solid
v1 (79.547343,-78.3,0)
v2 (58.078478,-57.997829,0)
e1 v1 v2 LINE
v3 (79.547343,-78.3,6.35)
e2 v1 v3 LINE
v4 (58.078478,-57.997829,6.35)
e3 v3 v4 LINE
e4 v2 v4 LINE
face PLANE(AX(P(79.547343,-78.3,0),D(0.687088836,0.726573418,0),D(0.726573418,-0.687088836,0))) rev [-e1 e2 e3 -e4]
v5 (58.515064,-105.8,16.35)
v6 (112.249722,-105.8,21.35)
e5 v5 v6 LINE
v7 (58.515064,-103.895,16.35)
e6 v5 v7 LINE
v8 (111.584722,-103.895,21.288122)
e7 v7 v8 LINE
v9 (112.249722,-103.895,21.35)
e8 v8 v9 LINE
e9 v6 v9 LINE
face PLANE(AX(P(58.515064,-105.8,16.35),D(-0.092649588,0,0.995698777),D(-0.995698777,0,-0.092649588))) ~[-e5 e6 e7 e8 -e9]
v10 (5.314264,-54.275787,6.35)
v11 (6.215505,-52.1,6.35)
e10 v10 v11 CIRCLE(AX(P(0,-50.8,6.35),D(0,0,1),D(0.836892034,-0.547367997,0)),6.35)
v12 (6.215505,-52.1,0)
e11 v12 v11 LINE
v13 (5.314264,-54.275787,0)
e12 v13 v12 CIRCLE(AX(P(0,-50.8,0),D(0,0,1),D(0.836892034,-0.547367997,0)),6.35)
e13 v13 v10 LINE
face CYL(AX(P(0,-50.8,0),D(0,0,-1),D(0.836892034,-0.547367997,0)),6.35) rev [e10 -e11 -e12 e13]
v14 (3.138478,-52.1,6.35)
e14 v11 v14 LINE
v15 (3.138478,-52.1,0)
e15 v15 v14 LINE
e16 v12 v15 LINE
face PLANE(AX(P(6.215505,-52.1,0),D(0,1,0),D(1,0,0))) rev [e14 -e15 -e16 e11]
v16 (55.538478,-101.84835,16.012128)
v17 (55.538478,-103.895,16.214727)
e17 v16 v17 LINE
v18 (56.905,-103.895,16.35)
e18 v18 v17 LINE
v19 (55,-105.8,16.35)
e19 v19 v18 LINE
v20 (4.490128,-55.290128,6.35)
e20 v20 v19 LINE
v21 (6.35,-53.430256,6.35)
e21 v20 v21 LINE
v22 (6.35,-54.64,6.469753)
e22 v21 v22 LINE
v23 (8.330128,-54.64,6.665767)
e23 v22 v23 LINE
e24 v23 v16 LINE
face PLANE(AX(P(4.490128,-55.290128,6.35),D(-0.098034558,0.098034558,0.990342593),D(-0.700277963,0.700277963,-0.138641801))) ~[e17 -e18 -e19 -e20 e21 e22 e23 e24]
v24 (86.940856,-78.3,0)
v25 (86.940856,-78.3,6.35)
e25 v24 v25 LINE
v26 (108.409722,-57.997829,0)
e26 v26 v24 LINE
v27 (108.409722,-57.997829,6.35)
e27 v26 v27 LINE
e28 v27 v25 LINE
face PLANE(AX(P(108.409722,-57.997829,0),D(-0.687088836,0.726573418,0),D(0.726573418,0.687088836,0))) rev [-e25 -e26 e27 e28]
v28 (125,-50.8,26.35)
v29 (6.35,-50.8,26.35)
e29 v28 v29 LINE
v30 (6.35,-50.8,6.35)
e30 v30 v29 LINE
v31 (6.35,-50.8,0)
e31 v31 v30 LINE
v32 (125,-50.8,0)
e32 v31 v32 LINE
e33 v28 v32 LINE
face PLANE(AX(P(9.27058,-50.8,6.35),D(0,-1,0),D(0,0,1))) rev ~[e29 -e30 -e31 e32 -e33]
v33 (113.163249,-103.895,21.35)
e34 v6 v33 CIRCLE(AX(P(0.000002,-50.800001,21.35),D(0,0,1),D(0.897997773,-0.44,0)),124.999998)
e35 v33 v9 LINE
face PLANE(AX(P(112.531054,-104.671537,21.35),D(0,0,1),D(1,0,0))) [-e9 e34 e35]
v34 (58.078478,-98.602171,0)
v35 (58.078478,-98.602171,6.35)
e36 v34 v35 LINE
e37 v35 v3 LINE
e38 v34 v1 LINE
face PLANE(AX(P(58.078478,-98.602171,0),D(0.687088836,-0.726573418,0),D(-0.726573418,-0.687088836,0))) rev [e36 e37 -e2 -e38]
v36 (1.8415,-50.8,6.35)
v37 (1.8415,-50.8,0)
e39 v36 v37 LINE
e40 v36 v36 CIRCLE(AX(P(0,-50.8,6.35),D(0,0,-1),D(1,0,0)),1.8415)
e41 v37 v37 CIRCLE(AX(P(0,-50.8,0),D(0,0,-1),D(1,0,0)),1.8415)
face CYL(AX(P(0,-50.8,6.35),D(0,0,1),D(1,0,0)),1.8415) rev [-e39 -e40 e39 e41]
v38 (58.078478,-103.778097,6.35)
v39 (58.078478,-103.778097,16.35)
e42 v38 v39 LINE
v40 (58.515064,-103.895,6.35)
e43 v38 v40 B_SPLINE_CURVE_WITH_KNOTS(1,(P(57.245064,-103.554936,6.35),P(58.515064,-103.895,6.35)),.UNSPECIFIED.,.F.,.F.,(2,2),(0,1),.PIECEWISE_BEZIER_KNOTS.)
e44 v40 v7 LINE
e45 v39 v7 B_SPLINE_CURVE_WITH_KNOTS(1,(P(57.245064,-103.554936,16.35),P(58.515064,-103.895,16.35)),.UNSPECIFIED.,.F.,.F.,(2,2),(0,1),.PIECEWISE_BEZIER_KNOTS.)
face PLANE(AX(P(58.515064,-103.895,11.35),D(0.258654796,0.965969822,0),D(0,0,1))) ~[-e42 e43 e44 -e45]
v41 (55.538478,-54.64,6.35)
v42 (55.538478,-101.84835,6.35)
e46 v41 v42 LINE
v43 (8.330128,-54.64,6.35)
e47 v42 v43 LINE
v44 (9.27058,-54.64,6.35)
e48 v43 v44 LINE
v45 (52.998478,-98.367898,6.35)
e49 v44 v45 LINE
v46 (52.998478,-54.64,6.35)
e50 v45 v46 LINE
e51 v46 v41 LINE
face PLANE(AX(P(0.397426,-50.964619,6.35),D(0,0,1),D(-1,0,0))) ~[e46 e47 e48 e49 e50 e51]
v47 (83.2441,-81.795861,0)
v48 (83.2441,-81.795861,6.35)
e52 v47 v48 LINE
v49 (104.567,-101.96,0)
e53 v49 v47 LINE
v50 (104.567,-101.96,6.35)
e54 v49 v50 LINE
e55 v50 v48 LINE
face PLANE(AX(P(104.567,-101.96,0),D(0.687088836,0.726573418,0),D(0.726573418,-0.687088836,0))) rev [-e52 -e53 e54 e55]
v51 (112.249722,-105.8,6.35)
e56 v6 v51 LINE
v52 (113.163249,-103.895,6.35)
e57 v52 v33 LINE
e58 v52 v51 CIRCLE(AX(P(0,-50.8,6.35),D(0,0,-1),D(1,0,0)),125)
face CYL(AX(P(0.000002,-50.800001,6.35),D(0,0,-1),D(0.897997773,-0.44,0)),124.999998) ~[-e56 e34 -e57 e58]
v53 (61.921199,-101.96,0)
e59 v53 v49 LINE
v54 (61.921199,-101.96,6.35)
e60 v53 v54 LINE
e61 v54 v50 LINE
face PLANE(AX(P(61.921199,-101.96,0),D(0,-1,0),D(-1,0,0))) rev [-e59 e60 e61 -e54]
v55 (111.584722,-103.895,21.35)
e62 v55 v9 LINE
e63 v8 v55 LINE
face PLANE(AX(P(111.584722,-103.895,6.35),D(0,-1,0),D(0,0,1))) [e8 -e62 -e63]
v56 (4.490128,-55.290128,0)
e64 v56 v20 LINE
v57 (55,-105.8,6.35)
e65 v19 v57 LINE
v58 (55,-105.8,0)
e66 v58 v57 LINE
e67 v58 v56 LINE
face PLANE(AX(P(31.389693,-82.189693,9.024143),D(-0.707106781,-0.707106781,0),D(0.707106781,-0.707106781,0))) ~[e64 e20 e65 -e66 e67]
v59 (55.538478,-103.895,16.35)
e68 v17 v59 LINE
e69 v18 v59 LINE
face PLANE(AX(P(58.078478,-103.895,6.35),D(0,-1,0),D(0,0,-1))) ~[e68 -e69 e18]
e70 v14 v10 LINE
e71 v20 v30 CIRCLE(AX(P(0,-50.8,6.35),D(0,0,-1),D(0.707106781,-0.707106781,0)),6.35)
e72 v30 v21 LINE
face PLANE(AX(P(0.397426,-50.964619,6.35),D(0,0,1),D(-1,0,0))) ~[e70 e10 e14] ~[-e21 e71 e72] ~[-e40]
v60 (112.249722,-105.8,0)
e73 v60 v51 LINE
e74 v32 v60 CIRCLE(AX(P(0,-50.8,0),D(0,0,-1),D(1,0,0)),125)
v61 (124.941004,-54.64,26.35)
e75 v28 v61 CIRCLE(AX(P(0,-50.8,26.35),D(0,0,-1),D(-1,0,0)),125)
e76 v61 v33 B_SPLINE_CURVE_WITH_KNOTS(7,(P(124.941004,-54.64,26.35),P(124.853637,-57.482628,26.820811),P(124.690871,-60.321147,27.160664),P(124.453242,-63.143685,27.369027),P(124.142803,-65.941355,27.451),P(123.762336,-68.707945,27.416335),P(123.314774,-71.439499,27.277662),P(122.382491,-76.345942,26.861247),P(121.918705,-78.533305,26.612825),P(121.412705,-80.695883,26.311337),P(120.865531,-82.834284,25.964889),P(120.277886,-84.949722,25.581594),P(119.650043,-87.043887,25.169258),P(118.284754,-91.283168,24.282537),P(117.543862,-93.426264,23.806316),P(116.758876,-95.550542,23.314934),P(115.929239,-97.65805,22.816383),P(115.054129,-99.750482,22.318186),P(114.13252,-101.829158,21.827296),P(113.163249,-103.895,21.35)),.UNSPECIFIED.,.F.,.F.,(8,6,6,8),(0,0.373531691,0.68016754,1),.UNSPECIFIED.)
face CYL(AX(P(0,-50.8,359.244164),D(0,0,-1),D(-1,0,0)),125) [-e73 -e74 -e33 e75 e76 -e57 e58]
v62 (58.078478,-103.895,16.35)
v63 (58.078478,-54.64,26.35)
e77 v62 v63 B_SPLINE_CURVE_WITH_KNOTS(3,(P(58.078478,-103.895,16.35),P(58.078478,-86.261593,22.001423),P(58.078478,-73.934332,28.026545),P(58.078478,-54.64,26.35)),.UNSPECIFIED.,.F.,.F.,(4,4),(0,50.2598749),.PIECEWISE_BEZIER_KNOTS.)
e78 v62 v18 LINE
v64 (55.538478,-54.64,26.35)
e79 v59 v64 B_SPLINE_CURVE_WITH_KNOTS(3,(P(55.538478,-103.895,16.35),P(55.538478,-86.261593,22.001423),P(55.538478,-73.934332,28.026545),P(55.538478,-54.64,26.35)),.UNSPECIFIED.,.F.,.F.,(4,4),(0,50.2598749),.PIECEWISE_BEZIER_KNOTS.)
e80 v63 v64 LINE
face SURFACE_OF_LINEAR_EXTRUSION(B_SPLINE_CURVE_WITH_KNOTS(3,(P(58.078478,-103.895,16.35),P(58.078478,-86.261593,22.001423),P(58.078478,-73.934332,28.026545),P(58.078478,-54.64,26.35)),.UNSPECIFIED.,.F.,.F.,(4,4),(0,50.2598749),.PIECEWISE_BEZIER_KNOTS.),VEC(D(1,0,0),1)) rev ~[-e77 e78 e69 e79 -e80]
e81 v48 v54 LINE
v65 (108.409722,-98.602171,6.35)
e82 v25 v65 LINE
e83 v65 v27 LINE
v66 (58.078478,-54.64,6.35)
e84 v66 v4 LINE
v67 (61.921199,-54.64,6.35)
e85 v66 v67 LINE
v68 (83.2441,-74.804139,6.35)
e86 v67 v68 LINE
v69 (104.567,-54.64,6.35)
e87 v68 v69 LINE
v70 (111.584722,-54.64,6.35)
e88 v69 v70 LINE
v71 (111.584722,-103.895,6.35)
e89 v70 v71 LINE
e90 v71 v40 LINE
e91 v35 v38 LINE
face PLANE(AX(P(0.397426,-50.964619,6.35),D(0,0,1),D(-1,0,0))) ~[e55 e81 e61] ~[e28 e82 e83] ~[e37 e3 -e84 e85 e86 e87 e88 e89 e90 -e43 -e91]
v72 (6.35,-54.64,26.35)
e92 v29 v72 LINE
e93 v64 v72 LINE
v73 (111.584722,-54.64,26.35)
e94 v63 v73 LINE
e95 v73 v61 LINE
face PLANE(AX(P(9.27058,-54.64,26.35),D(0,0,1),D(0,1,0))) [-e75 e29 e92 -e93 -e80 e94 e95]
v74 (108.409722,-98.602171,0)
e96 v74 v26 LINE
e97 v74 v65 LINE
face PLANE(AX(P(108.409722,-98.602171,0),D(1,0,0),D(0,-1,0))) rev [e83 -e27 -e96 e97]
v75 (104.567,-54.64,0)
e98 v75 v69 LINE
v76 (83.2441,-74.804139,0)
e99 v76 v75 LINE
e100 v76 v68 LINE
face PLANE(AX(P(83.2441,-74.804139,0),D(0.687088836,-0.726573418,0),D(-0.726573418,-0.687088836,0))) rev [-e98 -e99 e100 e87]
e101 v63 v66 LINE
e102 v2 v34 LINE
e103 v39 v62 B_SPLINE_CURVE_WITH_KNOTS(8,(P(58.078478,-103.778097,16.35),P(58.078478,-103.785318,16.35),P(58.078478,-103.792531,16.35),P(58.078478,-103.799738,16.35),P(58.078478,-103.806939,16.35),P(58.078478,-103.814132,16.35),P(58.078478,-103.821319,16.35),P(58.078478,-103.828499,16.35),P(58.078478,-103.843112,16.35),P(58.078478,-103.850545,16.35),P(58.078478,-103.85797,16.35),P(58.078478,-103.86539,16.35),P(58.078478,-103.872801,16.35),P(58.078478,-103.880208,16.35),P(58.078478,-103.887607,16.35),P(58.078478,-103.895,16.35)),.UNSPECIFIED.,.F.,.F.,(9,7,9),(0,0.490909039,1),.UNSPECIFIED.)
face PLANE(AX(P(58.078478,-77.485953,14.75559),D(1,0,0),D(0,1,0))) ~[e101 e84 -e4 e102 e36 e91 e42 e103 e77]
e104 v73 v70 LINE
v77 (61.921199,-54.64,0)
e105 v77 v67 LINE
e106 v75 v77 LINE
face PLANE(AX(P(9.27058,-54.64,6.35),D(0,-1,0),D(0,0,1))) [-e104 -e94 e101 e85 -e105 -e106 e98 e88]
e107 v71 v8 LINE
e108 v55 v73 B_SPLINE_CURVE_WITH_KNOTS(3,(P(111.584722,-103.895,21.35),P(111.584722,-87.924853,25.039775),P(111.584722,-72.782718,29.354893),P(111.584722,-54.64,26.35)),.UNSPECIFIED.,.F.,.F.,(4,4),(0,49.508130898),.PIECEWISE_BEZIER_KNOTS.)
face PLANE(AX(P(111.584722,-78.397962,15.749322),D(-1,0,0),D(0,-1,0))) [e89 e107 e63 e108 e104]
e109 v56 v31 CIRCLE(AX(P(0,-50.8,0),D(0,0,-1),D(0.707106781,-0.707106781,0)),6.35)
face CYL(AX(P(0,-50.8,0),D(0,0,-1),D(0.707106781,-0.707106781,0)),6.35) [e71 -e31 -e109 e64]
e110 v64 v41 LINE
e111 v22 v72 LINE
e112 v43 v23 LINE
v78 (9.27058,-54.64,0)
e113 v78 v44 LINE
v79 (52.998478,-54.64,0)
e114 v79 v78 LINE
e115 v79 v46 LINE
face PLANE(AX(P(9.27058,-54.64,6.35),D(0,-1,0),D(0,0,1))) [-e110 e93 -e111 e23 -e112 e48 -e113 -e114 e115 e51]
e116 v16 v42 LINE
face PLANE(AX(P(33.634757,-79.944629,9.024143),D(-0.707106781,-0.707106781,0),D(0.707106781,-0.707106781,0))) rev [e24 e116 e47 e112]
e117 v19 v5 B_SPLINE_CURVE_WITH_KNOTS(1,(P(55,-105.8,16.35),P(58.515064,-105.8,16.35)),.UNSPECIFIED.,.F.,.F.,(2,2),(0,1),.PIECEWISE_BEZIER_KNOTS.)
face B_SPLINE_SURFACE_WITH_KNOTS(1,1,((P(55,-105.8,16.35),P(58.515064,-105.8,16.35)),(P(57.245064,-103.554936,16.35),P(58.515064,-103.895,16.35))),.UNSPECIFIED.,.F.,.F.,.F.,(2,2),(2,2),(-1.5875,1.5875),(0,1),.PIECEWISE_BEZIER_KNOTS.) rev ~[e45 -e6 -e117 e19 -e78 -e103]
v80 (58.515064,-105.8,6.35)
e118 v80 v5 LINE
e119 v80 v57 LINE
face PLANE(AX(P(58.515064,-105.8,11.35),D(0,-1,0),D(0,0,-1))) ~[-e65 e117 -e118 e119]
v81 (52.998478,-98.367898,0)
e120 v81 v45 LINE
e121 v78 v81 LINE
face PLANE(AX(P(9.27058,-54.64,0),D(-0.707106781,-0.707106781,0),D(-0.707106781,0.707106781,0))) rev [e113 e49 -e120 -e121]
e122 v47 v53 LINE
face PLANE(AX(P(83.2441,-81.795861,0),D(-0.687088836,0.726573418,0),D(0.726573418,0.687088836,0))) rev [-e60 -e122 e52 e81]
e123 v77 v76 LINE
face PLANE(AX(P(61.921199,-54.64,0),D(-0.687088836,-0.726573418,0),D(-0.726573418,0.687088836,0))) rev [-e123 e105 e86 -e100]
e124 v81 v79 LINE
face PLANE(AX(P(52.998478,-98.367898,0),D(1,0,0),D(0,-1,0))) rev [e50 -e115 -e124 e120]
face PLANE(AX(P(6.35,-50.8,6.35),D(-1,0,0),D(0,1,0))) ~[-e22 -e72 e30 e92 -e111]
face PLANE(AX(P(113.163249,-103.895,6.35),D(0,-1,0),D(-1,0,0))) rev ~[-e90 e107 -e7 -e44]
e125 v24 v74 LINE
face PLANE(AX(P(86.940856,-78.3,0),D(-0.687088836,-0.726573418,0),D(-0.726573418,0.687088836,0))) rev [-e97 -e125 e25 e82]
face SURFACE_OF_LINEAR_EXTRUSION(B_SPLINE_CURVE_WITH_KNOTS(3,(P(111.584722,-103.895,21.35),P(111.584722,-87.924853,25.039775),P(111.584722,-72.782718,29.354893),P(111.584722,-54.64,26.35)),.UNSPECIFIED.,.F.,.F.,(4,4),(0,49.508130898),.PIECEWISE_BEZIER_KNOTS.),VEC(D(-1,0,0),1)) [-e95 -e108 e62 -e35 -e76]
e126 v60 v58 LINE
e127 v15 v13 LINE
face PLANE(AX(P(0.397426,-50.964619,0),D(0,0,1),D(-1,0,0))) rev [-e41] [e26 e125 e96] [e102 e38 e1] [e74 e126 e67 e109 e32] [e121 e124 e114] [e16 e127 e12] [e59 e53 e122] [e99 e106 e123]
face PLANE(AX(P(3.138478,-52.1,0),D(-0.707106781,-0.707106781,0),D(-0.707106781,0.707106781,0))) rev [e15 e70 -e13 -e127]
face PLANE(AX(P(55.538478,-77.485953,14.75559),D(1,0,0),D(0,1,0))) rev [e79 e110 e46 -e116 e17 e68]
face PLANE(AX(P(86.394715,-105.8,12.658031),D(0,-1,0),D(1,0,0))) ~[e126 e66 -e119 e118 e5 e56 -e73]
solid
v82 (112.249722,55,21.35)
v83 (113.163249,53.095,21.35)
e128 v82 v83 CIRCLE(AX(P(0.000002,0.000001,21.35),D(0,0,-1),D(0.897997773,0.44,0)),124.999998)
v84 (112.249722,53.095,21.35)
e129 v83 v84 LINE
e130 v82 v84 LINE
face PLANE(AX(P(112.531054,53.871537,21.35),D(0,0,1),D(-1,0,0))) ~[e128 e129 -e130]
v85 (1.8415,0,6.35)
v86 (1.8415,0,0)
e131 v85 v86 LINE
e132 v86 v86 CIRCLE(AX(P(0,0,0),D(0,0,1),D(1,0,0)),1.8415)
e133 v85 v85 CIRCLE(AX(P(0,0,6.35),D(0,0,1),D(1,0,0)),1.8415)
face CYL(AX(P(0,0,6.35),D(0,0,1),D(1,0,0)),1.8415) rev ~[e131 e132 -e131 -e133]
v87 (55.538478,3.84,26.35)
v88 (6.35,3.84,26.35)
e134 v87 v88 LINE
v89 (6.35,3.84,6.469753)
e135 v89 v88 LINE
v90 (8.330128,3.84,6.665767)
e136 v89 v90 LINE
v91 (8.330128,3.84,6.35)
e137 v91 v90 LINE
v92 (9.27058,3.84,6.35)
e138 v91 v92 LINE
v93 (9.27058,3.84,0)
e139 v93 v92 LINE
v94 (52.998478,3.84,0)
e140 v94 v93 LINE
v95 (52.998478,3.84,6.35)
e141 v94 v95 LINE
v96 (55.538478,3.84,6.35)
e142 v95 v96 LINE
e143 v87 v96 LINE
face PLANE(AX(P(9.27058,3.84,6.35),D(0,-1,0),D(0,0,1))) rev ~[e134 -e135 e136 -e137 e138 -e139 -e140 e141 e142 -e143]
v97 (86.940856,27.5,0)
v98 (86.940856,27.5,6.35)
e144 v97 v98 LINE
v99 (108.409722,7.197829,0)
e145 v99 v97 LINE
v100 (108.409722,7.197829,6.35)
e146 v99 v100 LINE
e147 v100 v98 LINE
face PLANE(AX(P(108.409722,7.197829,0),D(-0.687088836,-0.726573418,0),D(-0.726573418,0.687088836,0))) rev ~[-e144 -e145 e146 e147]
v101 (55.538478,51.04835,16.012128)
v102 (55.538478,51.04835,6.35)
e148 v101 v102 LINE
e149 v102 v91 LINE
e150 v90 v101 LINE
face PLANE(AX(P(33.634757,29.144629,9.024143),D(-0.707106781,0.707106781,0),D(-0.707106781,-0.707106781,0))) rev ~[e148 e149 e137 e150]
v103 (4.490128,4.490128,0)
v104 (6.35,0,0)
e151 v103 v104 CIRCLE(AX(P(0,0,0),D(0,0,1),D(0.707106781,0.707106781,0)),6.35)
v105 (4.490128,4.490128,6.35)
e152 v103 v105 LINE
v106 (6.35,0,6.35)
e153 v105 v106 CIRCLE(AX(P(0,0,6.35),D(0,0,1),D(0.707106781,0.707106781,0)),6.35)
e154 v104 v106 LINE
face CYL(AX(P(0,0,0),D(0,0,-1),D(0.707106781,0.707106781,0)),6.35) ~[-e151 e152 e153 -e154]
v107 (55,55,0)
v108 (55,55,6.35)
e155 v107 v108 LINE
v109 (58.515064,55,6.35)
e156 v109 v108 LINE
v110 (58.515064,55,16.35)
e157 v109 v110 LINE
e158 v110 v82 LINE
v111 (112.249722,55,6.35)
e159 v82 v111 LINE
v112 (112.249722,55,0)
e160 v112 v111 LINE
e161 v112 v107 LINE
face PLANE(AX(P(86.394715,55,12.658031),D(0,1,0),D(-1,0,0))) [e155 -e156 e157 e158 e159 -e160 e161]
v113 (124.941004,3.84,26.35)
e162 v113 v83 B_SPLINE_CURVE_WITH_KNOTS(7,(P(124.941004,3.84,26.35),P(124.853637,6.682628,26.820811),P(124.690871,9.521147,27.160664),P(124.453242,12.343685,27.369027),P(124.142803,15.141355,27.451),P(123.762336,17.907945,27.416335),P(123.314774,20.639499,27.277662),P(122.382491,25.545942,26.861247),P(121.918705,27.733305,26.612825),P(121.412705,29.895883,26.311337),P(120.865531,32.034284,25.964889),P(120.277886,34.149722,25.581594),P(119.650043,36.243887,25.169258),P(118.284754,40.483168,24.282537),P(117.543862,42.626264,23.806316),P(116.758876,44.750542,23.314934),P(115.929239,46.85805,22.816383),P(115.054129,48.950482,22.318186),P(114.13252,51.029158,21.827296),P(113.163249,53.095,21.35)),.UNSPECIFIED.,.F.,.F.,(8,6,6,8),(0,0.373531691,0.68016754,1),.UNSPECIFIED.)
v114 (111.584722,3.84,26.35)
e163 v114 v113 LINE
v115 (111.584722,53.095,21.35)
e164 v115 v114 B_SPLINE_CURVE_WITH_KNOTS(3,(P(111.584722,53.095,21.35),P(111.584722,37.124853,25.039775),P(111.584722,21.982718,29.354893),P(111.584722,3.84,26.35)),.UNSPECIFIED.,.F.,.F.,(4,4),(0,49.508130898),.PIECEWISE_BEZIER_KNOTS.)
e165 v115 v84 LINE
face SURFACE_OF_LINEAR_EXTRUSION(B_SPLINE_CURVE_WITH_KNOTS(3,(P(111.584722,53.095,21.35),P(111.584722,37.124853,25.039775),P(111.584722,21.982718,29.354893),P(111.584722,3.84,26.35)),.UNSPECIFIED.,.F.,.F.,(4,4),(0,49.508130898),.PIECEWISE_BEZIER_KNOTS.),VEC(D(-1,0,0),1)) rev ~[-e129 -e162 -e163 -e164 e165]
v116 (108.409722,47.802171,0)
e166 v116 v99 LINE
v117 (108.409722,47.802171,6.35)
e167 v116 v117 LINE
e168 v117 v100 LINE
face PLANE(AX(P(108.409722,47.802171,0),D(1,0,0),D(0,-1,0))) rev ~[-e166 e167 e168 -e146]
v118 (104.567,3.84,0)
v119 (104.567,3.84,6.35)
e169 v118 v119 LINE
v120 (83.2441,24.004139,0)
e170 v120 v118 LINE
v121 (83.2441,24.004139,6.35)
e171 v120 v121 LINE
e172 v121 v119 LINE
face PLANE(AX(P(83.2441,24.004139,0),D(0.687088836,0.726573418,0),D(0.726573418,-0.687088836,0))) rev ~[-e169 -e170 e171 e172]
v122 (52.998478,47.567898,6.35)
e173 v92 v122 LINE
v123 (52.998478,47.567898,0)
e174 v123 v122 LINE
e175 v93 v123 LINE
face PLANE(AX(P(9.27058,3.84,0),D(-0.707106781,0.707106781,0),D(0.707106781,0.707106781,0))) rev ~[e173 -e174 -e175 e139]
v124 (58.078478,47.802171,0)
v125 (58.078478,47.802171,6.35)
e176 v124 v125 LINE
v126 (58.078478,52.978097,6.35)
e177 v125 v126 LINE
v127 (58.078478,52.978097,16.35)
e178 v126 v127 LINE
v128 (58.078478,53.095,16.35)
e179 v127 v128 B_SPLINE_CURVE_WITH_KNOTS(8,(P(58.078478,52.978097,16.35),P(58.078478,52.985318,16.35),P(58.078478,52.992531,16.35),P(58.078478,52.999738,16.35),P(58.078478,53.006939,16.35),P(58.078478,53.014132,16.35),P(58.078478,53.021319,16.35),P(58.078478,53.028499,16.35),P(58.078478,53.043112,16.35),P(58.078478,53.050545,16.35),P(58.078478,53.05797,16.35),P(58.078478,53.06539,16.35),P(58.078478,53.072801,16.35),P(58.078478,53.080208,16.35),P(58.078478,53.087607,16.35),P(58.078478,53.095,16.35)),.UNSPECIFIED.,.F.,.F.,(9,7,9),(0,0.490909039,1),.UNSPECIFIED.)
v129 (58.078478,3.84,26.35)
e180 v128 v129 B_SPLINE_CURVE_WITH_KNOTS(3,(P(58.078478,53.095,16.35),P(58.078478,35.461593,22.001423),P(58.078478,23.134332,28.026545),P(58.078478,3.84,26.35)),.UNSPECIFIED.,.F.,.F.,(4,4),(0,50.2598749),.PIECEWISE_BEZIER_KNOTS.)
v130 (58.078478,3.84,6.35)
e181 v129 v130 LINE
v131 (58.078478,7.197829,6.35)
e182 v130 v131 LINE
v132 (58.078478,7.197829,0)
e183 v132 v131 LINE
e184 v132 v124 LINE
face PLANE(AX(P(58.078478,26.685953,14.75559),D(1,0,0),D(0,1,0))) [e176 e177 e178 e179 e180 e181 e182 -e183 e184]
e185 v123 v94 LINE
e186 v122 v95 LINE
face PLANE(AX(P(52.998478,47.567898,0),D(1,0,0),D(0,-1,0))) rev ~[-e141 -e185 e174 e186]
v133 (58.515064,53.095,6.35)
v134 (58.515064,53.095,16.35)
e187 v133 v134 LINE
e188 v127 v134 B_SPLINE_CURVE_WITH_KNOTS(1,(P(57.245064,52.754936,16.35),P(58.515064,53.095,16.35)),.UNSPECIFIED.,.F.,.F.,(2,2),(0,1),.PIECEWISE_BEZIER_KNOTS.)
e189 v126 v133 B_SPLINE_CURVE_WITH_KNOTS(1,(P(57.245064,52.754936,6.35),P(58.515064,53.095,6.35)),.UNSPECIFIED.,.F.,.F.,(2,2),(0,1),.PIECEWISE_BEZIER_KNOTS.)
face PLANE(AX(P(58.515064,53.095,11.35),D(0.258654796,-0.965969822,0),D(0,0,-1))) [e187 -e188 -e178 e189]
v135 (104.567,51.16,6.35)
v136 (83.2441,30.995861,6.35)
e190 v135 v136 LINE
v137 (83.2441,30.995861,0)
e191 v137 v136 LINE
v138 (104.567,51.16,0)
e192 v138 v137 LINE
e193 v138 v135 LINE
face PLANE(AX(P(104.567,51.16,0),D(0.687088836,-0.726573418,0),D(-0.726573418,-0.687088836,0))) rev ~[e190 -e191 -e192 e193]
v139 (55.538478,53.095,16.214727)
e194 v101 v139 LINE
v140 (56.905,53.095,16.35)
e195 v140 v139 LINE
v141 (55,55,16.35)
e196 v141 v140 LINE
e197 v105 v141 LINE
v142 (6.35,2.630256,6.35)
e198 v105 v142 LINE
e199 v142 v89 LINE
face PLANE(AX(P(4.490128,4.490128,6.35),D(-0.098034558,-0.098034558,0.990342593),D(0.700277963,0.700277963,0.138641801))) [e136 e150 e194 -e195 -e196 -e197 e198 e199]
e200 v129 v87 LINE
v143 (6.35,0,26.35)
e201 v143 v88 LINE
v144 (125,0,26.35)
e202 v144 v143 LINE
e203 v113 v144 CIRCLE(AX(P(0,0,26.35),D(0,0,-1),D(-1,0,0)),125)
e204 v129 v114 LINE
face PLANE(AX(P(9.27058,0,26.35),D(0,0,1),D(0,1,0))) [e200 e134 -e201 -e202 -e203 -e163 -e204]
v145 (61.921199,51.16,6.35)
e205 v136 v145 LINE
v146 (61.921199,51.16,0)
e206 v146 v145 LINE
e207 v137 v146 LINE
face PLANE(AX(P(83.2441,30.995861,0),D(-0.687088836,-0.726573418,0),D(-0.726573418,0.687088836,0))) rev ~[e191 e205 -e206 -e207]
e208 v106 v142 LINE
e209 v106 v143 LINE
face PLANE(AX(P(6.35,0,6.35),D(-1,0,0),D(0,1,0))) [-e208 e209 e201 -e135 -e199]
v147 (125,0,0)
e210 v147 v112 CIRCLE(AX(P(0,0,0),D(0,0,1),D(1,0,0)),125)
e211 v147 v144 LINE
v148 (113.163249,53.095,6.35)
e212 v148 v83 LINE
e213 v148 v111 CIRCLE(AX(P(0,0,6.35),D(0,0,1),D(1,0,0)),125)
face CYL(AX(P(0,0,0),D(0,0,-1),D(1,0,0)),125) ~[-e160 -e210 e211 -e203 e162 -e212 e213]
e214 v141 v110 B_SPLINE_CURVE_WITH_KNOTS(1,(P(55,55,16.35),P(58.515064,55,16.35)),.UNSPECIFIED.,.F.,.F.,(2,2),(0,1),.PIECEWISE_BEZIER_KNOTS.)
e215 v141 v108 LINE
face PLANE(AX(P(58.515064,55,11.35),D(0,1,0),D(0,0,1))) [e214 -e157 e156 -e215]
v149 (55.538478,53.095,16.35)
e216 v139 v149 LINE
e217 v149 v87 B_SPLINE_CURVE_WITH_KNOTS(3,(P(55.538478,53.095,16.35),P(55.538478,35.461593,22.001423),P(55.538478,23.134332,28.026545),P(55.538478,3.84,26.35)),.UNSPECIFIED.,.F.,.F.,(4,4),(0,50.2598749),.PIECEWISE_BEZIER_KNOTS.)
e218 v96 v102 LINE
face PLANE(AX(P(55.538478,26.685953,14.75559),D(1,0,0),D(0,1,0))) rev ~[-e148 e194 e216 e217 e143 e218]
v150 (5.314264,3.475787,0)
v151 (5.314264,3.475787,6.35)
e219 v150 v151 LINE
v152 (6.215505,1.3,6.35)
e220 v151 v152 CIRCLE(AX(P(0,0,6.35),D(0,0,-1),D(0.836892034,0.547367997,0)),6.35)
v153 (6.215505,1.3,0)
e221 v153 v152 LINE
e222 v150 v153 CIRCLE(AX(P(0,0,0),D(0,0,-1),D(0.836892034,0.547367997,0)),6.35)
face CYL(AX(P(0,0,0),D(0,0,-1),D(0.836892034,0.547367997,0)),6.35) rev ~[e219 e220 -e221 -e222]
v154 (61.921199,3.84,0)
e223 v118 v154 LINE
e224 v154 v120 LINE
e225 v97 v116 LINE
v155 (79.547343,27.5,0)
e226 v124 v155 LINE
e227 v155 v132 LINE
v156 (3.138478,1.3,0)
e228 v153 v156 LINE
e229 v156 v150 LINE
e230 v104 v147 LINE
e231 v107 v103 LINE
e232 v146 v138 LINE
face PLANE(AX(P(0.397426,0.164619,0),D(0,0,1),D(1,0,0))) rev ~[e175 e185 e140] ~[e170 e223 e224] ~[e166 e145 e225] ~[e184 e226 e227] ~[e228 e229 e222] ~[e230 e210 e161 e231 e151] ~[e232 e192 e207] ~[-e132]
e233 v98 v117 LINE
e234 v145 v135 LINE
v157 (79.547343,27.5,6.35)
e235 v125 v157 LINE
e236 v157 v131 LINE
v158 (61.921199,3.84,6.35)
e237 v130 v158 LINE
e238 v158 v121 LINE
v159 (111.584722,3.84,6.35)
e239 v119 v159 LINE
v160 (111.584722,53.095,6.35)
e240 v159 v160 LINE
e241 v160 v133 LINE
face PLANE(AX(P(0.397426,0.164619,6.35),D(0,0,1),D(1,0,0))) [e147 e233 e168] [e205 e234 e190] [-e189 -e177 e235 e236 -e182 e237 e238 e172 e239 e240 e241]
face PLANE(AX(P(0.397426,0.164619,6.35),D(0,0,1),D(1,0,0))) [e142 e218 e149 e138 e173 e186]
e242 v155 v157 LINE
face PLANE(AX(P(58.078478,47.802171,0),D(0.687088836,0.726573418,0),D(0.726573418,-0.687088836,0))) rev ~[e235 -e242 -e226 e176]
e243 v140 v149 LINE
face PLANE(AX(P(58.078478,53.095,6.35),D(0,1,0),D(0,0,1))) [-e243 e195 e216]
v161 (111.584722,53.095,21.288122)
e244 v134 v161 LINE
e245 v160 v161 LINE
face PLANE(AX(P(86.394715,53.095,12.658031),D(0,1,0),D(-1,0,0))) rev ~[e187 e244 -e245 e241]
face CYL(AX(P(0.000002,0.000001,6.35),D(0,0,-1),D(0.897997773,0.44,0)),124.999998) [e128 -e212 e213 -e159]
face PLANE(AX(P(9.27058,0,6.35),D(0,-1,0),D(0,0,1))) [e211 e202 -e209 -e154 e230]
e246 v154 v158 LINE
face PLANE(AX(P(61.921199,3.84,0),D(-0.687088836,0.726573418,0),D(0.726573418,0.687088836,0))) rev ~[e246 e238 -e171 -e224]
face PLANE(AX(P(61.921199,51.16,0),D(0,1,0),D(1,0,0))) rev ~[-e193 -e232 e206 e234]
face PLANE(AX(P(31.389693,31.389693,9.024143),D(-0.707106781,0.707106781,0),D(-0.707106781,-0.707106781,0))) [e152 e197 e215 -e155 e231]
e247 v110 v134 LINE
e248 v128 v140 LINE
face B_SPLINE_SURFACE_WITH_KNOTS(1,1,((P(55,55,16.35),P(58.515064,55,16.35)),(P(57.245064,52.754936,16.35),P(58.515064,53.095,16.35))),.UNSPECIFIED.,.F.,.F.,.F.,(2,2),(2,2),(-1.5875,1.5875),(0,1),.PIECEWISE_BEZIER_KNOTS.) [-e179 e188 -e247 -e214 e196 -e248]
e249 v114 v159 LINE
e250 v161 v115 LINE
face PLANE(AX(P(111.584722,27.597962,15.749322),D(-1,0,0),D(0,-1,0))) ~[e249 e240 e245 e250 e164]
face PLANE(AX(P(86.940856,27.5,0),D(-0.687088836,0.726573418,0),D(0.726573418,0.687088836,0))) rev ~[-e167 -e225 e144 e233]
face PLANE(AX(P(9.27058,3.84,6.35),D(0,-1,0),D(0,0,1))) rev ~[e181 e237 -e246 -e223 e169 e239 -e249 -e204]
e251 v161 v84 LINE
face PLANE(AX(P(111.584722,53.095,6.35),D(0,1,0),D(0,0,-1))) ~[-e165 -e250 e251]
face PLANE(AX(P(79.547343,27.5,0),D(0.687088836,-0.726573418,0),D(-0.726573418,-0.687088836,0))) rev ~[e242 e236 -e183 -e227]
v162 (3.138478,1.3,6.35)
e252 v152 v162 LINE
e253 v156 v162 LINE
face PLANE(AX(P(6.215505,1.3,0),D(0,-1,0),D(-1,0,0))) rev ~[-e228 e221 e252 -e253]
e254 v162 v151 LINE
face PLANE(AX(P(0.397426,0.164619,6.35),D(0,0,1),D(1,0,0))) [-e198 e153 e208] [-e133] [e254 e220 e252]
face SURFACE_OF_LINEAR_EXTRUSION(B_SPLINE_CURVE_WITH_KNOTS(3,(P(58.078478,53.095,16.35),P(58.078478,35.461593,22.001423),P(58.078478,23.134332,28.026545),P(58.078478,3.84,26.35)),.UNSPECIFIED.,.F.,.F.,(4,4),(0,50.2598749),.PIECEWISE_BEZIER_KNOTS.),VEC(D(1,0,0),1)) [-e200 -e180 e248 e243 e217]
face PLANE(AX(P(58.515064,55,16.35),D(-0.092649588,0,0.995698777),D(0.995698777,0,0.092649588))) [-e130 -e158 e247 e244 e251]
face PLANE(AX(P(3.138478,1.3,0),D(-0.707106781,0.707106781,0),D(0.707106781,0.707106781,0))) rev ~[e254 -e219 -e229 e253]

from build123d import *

# Parameters (mm, degrees)
F1_DEPTH       = 6.35
F2_R           = 1.8415
F3_DEPTH       = 25.4
F4_W           = 2.9205800795
F4_H           = 3.84
F5_DEPTH       = 20
F7_DEPTH       = 3.175
F9_DEPTH       = 1.905
F7_FACE_W      = 3.175
F7_FACE_H      = 10
F9_FACE_W      = 1.905
F9_FACE_H      = 10
F12_DEPTH      = 2.54
F16_END_RADIUS = 125
F15_W          = 3.84
F15_H          = 20
F16_REACH      = 136.0957238483
F18_DEPTH      = 15
F21_END_RADIUS = 125
F21_REACH      = 66.9646272281
F23_END_RADIUS = 125
F22_W          = 3.84
F22_H          = 20
F23_REACH      = 136.0957238483


with BuildPart() as f1:
    # F0 (on Top) → F1 (new body)
    with BuildSketch(Plane.XY):
        with BuildLine():
            Line((6.35, 0), (0, 0))
            Line((0, 0), (4.4901280605, 4.4901280605))
            ThreePointArc((4.4901280605, 4.4901280605), (-5.8666350314, -2.4300397955), (6.35, 0))
        make_face()
        with BuildLine():
            Line((4.4901280605, 4.4901280605), (0, 0))
            Line((0, 0), (6.35, 0))
            ThreePointArc((6.35, 0), (6.3162867067, 0.6534693866), (6.2155048065, 1.3))
            Line((6.2155048065, 1.3), (3.1384776311, 1.3))
            Line((3.1384776311, 1.3), (5.3142644127, 3.4757867817))
            ThreePointArc((5.3142644127, 3.4757867817), (4.9283617968, 4.0042165276), (4.4901280605, 4.4901280605))
        make_face()
        with BuildLine():
            Line((55, 55), (4.4901280605, 4.4901280605))
            ThreePointArc((4.4901280605, 4.4901280605), (4.9283617968, 4.0042165276), (5.3142644127, 3.4757867817))
            Line((5.3142644127, 3.4757867817), (55.5384776311, 53.7))
            Line((55.5384776311, 53.7), (110.9497216032, 53.7))
            Line((110.9497216032, 53.7), (110.9497216032, 1.3))
            Line((110.9497216032, 1.3), (55.5384776311, 1.3))
            Line((55.5384776311, 1.3), (6.2155048065, 1.3))
            ThreePointArc((6.2155048065, 1.3), (6.3162867067, 0.6534693866), (6.35, 0))
            Line((6.35, 0), (112.2497216032, 0))
            Line((112.2497216032, 0), (112.2497216032, 55))
            Line((112.2497216032, 55), (55, 55))
        make_face()
        with BuildLine():
            Line((55.5384776311, 53.7), (5.3142644127, 3.4757867817))
            ThreePointArc((5.3142644127, 3.4757867817), (5.8666350314, 2.4300397955), (6.2155048065, 1.3))
            Line((6.2155048065, 1.3), (55.5384776311, 1.3))
            Line((55.5384776311, 1.3), (55.5384776311, 53.7))
        make_face()
        Polygon((52.9984776311, 3.84), (9.2705800795, 3.84), (52.9984776311, 47.5678975516), align=None, mode=Mode.SUBTRACT)
        Polygon((83.2440996172, 27.5), (55.5384776311, 53.7), (55.5384776311, 1.3), align=None)
        Polygon((58.0784776311, 7.197828817), (58.0784776311, 47.802171183), (79.5473432911, 27.5), align=None, mode=Mode.SUBTRACT)
        Polygon((83.2440996172, 27.5), (55.5384776311, 1.3), (110.9497216032, 1.3), align=None)
        Polygon((104.5670003976, 3.84), (61.9211988367, 3.84), (83.2440996172, 24.0041385538), align=None, mode=Mode.SUBTRACT)
        Polygon((110.9497216032, 53.7), (55.5384776311, 53.7), (83.2440996172, 27.5), align=None)
        Polygon((83.2440996172, 30.9958614462), (61.9211988367, 51.16), (104.5670003976, 51.16), align=None, mode=Mode.SUBTRACT)
        Polygon((110.9497216032, 1.3), (110.9497216032, 53.7), (83.2440996172, 27.5), align=None)
        Polygon((108.4097216032, 7.197828817), (86.9408559432, 27.5), (108.4097216032, 47.802171183), align=None, mode=Mode.SUBTRACT)
        with BuildLine():
            Line((112.2497216032, 55), (112.2497216032, 0))
            Line((112.2497216032, 0), (125, 0))
            ThreePointArc((125, 0), (121.7707173347, 28.2292826653), (112.2497216032, 55))
        make_face()
    extrude(amount=F1_DEPTH)

    # F2 (on face) → F3 (cut)
    with BuildSketch(Plane.XY.offset(6.35)):
        Circle(F2_R)
    extrude(amount=-F3_DEPTH, mode=Mode.SUBTRACT)

    # F4 (on face) → F5 (join)
    with BuildSketch(Plane.XY.offset(6.35)):
        with Locations((7.8102900398, 1.92)):
            Rectangle(F4_W, F4_H)
    extrude(amount=F5_DEPTH)

    # F6 (on face) → F7 (join)
    with BuildSketch(Plane(origin=(0, 0, 0), x_dir=(-0.7071067812, -0.7071067812, 0), z_dir=(-0.7071067812, 0.7071067812, 0))):
        Polygon((-77.7817459305, 16.35), (-77.7817459305, 6.35), (-6.35, 6.35), align=None)
    extrude(amount=-F7_DEPTH)

    # F8 (on face) → F9 (join)
    with BuildSketch(Plane(origin=(0, 55, 0), x_dir=(-1, 0, 0), z_dir=(0, 1, 0))):
        Polygon((-112.2497216032, 21.35), (-112.2497216032, 6.35), (-58.5150640303, 6.35), (-58.5150640303, 16.35), align=None)
    extrude(amount=-F9_DEPTH)

    # F7_face (on face) → F10 section 0
    with BuildSketch(Plane(origin=(56.1225320151, 53.8774679849, 11.35), x_dir=(-0.7071067812, 0.7071067812, 0), z_dir=(0.7071067812, 0.7071067812, 0))):
        Rectangle(F7_FACE_W, F7_FACE_H)
    # F9_face (on face) → F10 section 1
    with BuildSketch(Plane(origin=(58.5150640303, 54.0475, 11.35), x_dir=(0, -1, 0), z_dir=(-1, 0, 0))):
        Rectangle(F9_FACE_W, F9_FACE_H)
    loft()

    # F11 (on face) → F12 (join)
    with BuildSketch(Plane.YZ.offset(58.0784776311)):
        with BuildLine():
            add(Edge.make_bspline(
                [(53.095, 16.35), (35.4615934193, 22.0014229417), (23.1343321502, 28.0265454203), (3.84, 26.35)],
                knots=[0, 0, 0, 0, 50.2598749004, 50.2598749004, 50.2598749004, 50.2598749004], degree=3))
            Line((3.84, 26.35), (3.84, 6.35))
            Line((3.84, 6.35), (7.197828817, 6.35))
            Line((7.197828817, 6.35), (47.802171183, 6.35))
            Line((47.802171183, 6.35), (53.095, 6.35))
            Line((53.095, 6.35), (53.095, 16.35))
        make_face()
    extrude(amount=-F12_DEPTH)


with BuildPart() as f14_1:
    # F14: instance of F1
    add(f1.part.mirror(Plane(origin=(61.5116499252, -25.4, 4.122937651), x_dir=(1, 0, 0), z_dir=(0, -1, 0))))

    # F17 (on face) → F18 (join, through all)
    with BuildSketch(Plane.XY.offset(6.35)):
        with BuildLine():
            Line((113.1632492243, -103.895), (112.2497216032, -103.895))
            Line((112.2497216032, -103.895), (112.2497216032, -105.8))
            ThreePointArc((112.2497216032, -105.8), (112.7105102046, -104.8494300565), (113.1632492243, -103.895))
        make_face()
    extrude(amount=F18_DEPTH)

    f21_end = (Plane(origin=(0, -50.8, 10.675), x_dir=(-1, 0, 0), z_dir=(0, 0, -1)) * Cylinder(F21_END_RADIUS, 552.5885115546, mode=Mode.PRIVATE)).faces().sort_by_distance((122.0049305418, -77.9992081407, 5.7463948228))[0]
    # F20 (on offset) → F21 (join, up to the whole of a round face its end follows)
    with BuildSketch(Plane(origin=(111.5847216032, 0, 0), x_dir=(0, -1, 0), z_dir=(-1, 0, 0))):
        with BuildLine():
            Line((103.895, 6.35), (103.895, 21.35))
            add(Edge.make_bspline(
                [(103.895, 21.35), (87.9248529673, 25.0397752971), (72.7827176452, 29.3548926711), (54.64, 26.35)],
                knots=[0, 0, 0, 0, 49.5081308979, 49.5081308979, 49.5081308979, 49.5081308979], degree=3))
            Line((54.64, 26.35), (54.64, 6.35))
            Line((54.64, 6.35), (103.895, 6.35))
        make_face()
    f21_long = extrude(amount=-F21_REACH, mode=Mode.PRIVATE)
    add(split(f21_long, bisect_by=f21_end, keep=Keep.BOTTOM, mode=Mode.PRIVATE))

    f23_end = (Plane(origin=(0, -50.8, 13.7255002307), x_dir=(-1, 0, 0), z_dir=(0, 0, -1)) * Cylinder(F23_END_RADIUS, 691.0373274131, mode=Mode.PRIVATE)).faces().sort_by_distance((121.7707173347, -79.0292826653, 13.7255002307))[0]
    # F22 (on face) → F23 (join, up to the whole of a round face its end follows)
    with BuildSketch(Plane.YZ.offset(9.2705800795)):
        with Locations((-52.72, 16.35)):
            Rectangle(F22_W, F22_H)
    f23_long = extrude(amount=F23_REACH, mode=Mode.PRIVATE)
    add(split(f23_long, bisect_by=f23_end, keep=Keep.BOTTOM, mode=Mode.PRIVATE))


with BuildPart() as f1_1:
    add(f1.part)

    f16_end = (Plane(origin=(0, 0, 3.175), x_dir=(-1, 0, 0), z_dir=(0, 0, -1)) * Cylinder(F16_END_RADIUS, 690.8507047952, mode=Mode.PRIVATE)).faces().sort_by_distance((121.7707173347, 28.2292826653, 3.175))[0]
    # F15 (on face) → F16 (join, up to the whole of a round face its end follows)
    with BuildSketch(Plane.YZ.offset(9.2705800795)):
        with Locations((1.92, 16.35)):
            Rectangle(F15_W, F15_H)
    f16_long = extrude(amount=F16_REACH, mode=Mode.PRIVATE)
    add(split(f16_long, bisect_by=f16_end, keep=Keep.BOTTOM, mode=Mode.PRIVATE))

    # F24: F14_1 across plane
    add(f14_1.part.mirror(Plane(origin=(61.5116499252, -25.4, 4.122937651), x_dir=(1, 0, 0), z_dir=(0, -1, 0))))


solid = Compound([f14_1.part, f1_1.part])
